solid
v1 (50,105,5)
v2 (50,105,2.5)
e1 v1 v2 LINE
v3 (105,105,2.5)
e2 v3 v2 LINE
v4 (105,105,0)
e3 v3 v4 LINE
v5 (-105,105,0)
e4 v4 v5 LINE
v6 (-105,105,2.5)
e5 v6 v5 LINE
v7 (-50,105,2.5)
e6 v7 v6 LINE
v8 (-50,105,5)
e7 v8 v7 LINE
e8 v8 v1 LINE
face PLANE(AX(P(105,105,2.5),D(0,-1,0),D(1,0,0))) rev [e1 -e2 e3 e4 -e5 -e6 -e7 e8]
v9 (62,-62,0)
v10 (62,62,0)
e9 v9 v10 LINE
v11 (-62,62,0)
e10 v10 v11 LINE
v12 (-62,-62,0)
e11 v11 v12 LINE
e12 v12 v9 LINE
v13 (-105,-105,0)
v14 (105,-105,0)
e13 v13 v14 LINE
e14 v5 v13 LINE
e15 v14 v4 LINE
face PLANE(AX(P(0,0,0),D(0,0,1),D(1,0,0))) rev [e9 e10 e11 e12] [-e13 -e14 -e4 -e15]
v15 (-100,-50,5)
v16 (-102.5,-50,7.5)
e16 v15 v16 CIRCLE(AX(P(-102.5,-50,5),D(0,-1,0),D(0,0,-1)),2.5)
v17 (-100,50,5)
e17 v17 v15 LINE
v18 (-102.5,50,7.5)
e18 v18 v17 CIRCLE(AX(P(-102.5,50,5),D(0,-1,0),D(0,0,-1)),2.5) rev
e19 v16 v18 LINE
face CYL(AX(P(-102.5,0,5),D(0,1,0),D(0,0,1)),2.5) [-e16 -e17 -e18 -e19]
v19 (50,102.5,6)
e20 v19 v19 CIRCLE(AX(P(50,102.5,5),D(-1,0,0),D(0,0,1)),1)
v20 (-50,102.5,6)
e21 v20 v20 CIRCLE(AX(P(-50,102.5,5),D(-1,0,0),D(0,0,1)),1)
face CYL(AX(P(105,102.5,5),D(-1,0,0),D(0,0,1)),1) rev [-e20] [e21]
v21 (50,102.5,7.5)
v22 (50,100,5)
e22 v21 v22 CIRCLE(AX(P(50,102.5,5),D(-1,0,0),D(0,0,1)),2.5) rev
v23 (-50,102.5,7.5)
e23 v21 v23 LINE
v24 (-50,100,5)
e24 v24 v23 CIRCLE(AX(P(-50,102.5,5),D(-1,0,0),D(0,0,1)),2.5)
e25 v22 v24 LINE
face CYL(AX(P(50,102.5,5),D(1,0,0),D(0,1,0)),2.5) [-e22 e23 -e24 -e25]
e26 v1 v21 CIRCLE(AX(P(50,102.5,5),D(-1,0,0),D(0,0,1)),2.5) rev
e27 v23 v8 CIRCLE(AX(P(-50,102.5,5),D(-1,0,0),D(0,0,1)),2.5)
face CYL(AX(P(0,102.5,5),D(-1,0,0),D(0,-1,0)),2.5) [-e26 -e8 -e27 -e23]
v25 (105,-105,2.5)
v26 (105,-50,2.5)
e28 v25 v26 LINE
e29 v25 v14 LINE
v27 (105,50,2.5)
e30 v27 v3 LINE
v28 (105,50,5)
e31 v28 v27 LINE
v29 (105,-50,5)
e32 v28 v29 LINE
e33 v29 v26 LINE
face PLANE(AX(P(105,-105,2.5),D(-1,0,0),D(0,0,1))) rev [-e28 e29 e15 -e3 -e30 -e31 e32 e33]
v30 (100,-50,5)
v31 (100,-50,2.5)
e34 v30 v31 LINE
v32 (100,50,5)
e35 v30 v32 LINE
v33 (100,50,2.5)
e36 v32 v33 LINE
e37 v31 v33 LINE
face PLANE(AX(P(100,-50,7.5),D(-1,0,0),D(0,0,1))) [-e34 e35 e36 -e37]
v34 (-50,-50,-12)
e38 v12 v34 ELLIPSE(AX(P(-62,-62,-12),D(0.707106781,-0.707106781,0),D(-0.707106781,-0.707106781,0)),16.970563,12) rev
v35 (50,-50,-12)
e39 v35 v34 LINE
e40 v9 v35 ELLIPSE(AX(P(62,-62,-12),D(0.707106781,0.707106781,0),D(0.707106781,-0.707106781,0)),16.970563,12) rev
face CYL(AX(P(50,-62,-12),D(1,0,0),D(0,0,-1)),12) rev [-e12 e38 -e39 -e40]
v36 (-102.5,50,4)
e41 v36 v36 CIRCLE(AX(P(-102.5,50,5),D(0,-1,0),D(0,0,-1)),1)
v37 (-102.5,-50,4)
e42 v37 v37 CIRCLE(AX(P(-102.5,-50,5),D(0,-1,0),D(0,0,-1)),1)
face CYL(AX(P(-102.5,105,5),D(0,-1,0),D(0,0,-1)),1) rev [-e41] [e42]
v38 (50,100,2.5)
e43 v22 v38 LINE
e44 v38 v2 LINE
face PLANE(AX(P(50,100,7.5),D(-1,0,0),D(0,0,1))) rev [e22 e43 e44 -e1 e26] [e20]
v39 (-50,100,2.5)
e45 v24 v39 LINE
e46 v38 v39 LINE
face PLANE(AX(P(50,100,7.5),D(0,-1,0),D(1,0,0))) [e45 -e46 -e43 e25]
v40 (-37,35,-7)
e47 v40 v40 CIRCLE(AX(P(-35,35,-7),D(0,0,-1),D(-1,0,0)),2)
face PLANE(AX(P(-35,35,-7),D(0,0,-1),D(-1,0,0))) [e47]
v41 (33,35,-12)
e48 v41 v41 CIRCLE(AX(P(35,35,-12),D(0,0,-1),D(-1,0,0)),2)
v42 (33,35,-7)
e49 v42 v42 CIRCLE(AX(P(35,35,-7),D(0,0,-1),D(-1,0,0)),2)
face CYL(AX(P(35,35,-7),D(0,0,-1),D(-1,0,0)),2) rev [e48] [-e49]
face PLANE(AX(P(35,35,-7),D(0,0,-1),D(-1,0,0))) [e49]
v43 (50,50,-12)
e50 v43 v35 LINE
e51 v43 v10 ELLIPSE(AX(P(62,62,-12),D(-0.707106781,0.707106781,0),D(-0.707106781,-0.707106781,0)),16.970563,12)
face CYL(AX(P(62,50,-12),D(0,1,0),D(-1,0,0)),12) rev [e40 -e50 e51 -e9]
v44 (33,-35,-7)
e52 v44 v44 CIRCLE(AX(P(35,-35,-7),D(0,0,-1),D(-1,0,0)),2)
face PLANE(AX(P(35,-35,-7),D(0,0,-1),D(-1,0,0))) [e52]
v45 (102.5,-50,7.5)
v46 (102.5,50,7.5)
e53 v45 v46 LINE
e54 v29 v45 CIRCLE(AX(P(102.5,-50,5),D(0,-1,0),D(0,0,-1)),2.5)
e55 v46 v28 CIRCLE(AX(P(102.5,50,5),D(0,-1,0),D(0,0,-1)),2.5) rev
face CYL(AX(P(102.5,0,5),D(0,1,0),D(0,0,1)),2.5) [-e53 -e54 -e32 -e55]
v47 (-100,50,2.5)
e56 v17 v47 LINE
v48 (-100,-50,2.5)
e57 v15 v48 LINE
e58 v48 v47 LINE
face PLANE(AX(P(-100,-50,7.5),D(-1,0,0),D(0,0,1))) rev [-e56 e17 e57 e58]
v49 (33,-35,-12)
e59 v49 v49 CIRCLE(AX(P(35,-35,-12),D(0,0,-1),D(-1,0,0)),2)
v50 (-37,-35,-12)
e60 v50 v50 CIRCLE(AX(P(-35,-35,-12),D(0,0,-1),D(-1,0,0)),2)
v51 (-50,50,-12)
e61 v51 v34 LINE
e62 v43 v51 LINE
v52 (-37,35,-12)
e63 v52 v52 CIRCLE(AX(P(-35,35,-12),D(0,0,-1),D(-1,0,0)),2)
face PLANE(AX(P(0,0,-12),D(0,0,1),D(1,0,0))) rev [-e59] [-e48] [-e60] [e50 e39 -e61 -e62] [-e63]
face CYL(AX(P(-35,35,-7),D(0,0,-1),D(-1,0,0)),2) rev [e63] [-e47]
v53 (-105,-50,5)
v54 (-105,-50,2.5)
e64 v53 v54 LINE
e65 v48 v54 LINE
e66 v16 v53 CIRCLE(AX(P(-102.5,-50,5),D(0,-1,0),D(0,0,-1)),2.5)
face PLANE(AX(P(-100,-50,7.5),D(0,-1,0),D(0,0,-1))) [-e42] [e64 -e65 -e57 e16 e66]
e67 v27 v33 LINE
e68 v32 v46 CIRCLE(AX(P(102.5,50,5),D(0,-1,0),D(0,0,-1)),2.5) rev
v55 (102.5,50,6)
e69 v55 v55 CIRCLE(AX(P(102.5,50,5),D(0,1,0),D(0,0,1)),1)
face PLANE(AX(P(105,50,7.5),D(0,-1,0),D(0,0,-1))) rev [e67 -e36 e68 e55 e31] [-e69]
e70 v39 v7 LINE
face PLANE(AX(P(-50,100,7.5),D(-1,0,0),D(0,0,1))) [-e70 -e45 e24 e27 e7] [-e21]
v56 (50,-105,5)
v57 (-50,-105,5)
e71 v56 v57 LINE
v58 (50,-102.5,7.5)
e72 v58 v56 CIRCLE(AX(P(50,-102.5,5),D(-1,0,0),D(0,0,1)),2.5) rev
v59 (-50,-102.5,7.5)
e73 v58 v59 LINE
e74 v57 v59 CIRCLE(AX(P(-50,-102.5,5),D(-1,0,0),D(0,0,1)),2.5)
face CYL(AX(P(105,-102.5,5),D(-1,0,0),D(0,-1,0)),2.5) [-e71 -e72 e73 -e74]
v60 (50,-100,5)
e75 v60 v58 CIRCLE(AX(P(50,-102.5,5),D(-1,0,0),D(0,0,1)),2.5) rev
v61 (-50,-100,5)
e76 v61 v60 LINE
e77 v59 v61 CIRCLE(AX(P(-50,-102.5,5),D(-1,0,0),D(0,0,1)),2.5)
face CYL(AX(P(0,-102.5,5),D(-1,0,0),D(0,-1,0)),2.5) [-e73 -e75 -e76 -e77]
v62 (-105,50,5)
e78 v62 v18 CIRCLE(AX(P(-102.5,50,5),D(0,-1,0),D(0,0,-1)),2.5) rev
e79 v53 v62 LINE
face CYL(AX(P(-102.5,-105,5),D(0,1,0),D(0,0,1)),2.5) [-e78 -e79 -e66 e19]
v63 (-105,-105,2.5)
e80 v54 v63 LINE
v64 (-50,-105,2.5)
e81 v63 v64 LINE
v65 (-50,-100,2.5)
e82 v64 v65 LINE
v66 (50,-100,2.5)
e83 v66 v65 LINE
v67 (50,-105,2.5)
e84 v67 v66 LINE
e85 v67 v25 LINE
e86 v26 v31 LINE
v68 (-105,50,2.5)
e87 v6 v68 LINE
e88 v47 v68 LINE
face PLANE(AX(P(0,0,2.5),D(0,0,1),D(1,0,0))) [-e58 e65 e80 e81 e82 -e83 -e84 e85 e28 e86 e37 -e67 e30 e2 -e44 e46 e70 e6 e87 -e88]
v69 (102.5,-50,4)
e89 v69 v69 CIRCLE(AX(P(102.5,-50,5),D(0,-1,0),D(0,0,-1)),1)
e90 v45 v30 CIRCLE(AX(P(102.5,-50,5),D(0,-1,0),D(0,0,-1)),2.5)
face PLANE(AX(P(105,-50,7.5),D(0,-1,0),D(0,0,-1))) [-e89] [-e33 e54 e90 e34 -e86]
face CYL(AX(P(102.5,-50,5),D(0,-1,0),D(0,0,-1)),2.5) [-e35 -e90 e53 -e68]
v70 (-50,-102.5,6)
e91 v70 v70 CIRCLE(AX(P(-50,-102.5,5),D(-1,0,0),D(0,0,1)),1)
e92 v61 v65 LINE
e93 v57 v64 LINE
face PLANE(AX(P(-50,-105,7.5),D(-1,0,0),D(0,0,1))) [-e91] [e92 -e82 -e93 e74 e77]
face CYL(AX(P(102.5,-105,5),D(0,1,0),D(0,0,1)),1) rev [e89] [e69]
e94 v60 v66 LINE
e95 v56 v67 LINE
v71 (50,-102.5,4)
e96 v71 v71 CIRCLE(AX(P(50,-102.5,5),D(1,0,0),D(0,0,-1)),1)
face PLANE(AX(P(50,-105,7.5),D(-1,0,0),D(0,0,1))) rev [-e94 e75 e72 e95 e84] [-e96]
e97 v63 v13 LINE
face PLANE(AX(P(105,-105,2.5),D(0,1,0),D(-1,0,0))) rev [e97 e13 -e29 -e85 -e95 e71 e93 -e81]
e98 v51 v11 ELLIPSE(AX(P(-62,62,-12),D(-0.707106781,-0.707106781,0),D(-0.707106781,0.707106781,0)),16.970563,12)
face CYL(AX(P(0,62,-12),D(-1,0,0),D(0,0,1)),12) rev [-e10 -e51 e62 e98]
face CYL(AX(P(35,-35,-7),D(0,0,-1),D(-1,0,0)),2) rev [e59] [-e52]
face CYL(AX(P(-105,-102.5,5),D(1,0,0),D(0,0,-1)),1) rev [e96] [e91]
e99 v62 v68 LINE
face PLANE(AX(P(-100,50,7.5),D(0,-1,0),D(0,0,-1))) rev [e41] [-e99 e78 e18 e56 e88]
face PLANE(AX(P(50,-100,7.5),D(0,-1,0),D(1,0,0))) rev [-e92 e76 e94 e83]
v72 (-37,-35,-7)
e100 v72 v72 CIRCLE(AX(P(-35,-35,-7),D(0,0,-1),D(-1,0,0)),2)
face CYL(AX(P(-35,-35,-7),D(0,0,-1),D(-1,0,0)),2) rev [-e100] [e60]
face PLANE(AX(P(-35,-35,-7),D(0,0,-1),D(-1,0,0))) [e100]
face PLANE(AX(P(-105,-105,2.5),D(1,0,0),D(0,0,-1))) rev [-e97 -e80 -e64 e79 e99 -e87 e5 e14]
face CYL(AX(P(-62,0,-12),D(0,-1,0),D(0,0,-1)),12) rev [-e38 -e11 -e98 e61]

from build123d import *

# Parameters (mm, degrees)
SKETCH_1_W               = 420
SKETCH_1_H               = 420
EXTRUDE_1_DEPTH          = 5
SKETCH_3_W               = 50
SKETCH_3_H               = 10
SKETCH_3_W_2             = 10
SKETCH_3_H_2             = 50
EXTRUDE_2_DEPTH          = 10
SKETCH_4_W               = 200
SKETCH_4_H               = 10
SKETCH_4_W_2             = 10
SKETCH_4_H_2             = 200
EXTRUDE_3_DEPTH          = 10
FILLET_1_R               = 5
SKETCH_5_R               = 2
CUT_EXTRUDE_1_DEPTH      = 422.366823564
SKETCH_6_R               = 2
CUT_EXTRUDE_2_DEPTH      = 375.733238451
CUT_EXTRUDE_3_DEPTH      = 422.366823564
CUT_EXTRUDE_3_DEPTH_BACK = 422.366823564
SKETCH_7_R               = 2
SKETCH_8_R               = 2
CUT_EXTRUDE_4_DEPTH      = 375.733238451
CUT_EXTRUDE_5_DEPTH      = 422.366823564
CUT_EXTRUDE_5_DEPTH_BACK = 422.366823564
SKETCH_9_R               = 2
SKETCH_10_R              = 2
CUT_EXTRUDE_6_DEPTH      = 375.733238451
CUT_EXTRUDE_7_DEPTH      = 422.366823564
CUT_EXTRUDE_7_DEPTH_BACK = 422.366823564
SKETCH_11_R              = 2
SKETCH_12_R              = 2
CUT_EXTRUDE_8_DEPTH      = 375.733238451
SCALE_1_SCALE            = 0.5
SKETCH_13_W              = 210
SKETCH_13_H              = 210
CUT_EXTRUDE_9_DEPTH      = 90
SKETCH_14_W              = 100
SKETCH_14_H              = 100
EXTRUDE_4_DEPTH          = 12
FILLET_2_R               = 12
SKETCH_15_R              = 2
CUT_EXTRUDE_10_DEPTH     = 5


with BuildPart() as part:
    # 草图1 → 凸台-拉伸1 (new body)
    with BuildSketch(Plane.XY):
        Rectangle(SKETCH_1_W, SKETCH_1_H)
    extrude(amount=EXTRUDE_1_DEPTH)

    # 草图3 → 凸台-拉伸2 (add)
    with BuildSketch(Plane(origin=(0, 0, 0), x_dir=(-1, 0, 0), z_dir=(0, 0, -1))):
        with Locations((-130, -205)):
            Rectangle(SKETCH_3_W, SKETCH_3_H)
        with Locations((-205, -130)):
            Rectangle(SKETCH_3_W_2, SKETCH_3_H_2)
        with Locations((-205, 130)):
            Rectangle(SKETCH_3_W_2, SKETCH_3_H_2)
        with Locations((-130, 205)):
            Rectangle(SKETCH_3_W, SKETCH_3_H)
        with Locations((205, 130)):
            Rectangle(SKETCH_3_W_2, SKETCH_3_H_2)
        with Locations((130, 205)):
            Rectangle(SKETCH_3_W, SKETCH_3_H)
        with Locations((205, -130)):
            Rectangle(SKETCH_3_W_2, SKETCH_3_H_2)
        with Locations((130, -205)):
            Rectangle(SKETCH_3_W, SKETCH_3_H)
    extrude(amount=EXTRUDE_2_DEPTH)

    # 草图4 → 凸台-拉伸3 (add)
    with BuildSketch(Plane.XY.offset(5)):
        with Locations((0, -205)):
            Rectangle(SKETCH_4_W, SKETCH_4_H)
        with Locations((205, 0)):
            Rectangle(SKETCH_4_W_2, SKETCH_4_H_2)
        with Locations((0, 205)):
            Rectangle(SKETCH_4_W, SKETCH_4_H)
        with Locations((-205, 0)):
            Rectangle(SKETCH_4_W_2, SKETCH_4_H_2)
    extrude(amount=EXTRUDE_3_DEPTH)

    # 圆角1
    fillet_1_edges = [part.edges().sort_by_distance(p)[0] for p in [
        (-210, 0, 15),
        (-200, 0, 15),
        (0, -210, 15),
        (0, -200, 15),
        (0, 200, 15),
        (0, 210, 15),
        (200, 0, 15),
        (210, 0, 15),
        (200, -130, -10),
        (210, -130, -10),
        (130, 210, -10),
        (130, 200, -10),
        (200, 130, -10),
        (210, 130, -10),
        (-130, -200, -10),
        (-130, -210, -10),
        (-130, 210, -10),
        (-130, 200, -10),
        (-210, 130, -10),
        (-200, 130, -10),
        (-210, -130, -10),
        (-200, -130, -10),
        (130, -200, -10),
        (130, -210, -10),
    ]]
    fillet(fillet_1_edges, radius=FILLET_1_R - 0.0001)  # a hair under: the kernel refuses the full size

    # 草图5 → 切除-拉伸1 (cut, through all)
    with BuildSketch(Plane(origin=(0, 155, 0), x_dir=(1, 0, 0), z_dir=(0, 1, 0))):
        with Locations(Location((205, 5, 0), (0, 0, 270))):
            Circle(SKETCH_5_R)
    extrude(amount=-CUT_EXTRUDE_1_DEPTH, mode=Mode.SUBTRACT)

    # 草图6 → 切除-拉伸2 (cut, through all)
    with BuildSketch(Plane(origin=(0, 100, 0), x_dir=(1, 0, 0), z_dir=(0, 1, 0))):
        with Locations(Location((205, -10, 0), (0, 0, 270))):
            Circle(SKETCH_6_R)
    extrude(amount=-CUT_EXTRUDE_2_DEPTH, mode=Mode.SUBTRACT)

    # 草图7 → 切除-拉伸3 (cut, two sides: drawn at the far end of the back side and taken through both)
    with BuildSketch(Plane(origin=(155, 0, 0), x_dir=(0, 0, -1), z_dir=(1, 0, 0)).offset(-CUT_EXTRUDE_3_DEPTH_BACK)):
        with Locations((5, -205)):
            Circle(SKETCH_7_R)
    extrude(amount=CUT_EXTRUDE_3_DEPTH + CUT_EXTRUDE_3_DEPTH_BACK, mode=Mode.SUBTRACT)

    # 草图8 → 切除-拉伸4 (cut, through all)
    with BuildSketch(Plane(origin=(100, 0, 0), x_dir=(0, 0, -1), z_dir=(1, 0, 0))):
        with Locations((-10, -205)):
            Circle(SKETCH_8_R)
    extrude(amount=-CUT_EXTRUDE_4_DEPTH, mode=Mode.SUBTRACT)

    # 草图9 → 切除-拉伸5 (cut, two sides: drawn at the far end of the back side and taken through both)
    with BuildSketch(Plane.XZ.offset(155).offset(-CUT_EXTRUDE_5_DEPTH_BACK)):
        with Locations((-205, -5)):
            Circle(SKETCH_9_R)
    extrude(amount=CUT_EXTRUDE_5_DEPTH + CUT_EXTRUDE_5_DEPTH_BACK, mode=Mode.SUBTRACT)

    # 草图10 → 切除-拉伸6 (cut, through all)
    with BuildSketch(Plane.XZ.offset(100)):
        with Locations(Location((-205, 10, 0), (0, 0, 270))):
            Circle(SKETCH_10_R)
    extrude(amount=-CUT_EXTRUDE_6_DEPTH, mode=Mode.SUBTRACT)

    # 草图11 → 切除-拉伸7 (cut, two sides: drawn at the far end of the back side and taken through both)
    with BuildSketch(Plane.ZY.offset(155).offset(-CUT_EXTRUDE_7_DEPTH_BACK)):
        with Locations(Location((-5, 205, 0), (0, 0, 270))):
            Circle(SKETCH_11_R)
    extrude(amount=CUT_EXTRUDE_7_DEPTH + CUT_EXTRUDE_7_DEPTH_BACK, mode=Mode.SUBTRACT)

    # 草图12 → 切除-拉伸8 (cut, through all)
    with BuildSketch(Plane.ZY.offset(100)):
        with Locations((10, 205)):
            Circle(SKETCH_12_R)
    extrude(amount=-CUT_EXTRUDE_8_DEPTH, mode=Mode.SUBTRACT)


with BuildPart() as part_1:
    # 缩放比例1: scaled about (0, 0, 0)
    add(part.part.scale(SCALE_1_SCALE))

    # 草图13 → 切除-拉伸9 (cut)
    with BuildSketch(Plane(origin=(0, 0, 0), x_dir=(-1, 0, 0), z_dir=(0, 0, -1))):
        Rectangle(SKETCH_13_W, SKETCH_13_H)
    extrude(amount=CUT_EXTRUDE_9_DEPTH, mode=Mode.SUBTRACT)

    # 草图14 → 凸台-拉伸4 (add)
    with BuildSketch(Plane(origin=(0, 0, 0), x_dir=(-1, 0, 0), z_dir=(0, 0, -1))):
        Rectangle(SKETCH_14_W, SKETCH_14_H)
    extrude(amount=EXTRUDE_4_DEPTH)

    # 圆角2
    fillet_2_edges = [part_1.edges().sort_by_distance(p)[0] for p in [
        (50, 0, 0),
        (0, -50, 0),
        (-50, 0, 0),
        (0, 50, 0),
    ]]
    fillet(fillet_2_edges, radius=FILLET_2_R - 0.0001)  # a hair under: the kernel refuses the full size

    # 草图15 → 切除-拉伸10 (cut)
    with BuildSketch(Plane(origin=(0, 0, -12), x_dir=(-1, 0, 0), z_dir=(0, 0, -1))):
        with Locations((-35, 35)):
            Circle(SKETCH_15_R)
        with Locations((35, 35)):
            Circle(SKETCH_15_R)
        with Locations((-35, -35)):
            Circle(SKETCH_15_R)
        with Locations((35, -35)):
            Circle(SKETCH_15_R)
    extrude(amount=-CUT_EXTRUDE_10_DEPTH, mode=Mode.SUBTRACT)


solid = part_1.part
